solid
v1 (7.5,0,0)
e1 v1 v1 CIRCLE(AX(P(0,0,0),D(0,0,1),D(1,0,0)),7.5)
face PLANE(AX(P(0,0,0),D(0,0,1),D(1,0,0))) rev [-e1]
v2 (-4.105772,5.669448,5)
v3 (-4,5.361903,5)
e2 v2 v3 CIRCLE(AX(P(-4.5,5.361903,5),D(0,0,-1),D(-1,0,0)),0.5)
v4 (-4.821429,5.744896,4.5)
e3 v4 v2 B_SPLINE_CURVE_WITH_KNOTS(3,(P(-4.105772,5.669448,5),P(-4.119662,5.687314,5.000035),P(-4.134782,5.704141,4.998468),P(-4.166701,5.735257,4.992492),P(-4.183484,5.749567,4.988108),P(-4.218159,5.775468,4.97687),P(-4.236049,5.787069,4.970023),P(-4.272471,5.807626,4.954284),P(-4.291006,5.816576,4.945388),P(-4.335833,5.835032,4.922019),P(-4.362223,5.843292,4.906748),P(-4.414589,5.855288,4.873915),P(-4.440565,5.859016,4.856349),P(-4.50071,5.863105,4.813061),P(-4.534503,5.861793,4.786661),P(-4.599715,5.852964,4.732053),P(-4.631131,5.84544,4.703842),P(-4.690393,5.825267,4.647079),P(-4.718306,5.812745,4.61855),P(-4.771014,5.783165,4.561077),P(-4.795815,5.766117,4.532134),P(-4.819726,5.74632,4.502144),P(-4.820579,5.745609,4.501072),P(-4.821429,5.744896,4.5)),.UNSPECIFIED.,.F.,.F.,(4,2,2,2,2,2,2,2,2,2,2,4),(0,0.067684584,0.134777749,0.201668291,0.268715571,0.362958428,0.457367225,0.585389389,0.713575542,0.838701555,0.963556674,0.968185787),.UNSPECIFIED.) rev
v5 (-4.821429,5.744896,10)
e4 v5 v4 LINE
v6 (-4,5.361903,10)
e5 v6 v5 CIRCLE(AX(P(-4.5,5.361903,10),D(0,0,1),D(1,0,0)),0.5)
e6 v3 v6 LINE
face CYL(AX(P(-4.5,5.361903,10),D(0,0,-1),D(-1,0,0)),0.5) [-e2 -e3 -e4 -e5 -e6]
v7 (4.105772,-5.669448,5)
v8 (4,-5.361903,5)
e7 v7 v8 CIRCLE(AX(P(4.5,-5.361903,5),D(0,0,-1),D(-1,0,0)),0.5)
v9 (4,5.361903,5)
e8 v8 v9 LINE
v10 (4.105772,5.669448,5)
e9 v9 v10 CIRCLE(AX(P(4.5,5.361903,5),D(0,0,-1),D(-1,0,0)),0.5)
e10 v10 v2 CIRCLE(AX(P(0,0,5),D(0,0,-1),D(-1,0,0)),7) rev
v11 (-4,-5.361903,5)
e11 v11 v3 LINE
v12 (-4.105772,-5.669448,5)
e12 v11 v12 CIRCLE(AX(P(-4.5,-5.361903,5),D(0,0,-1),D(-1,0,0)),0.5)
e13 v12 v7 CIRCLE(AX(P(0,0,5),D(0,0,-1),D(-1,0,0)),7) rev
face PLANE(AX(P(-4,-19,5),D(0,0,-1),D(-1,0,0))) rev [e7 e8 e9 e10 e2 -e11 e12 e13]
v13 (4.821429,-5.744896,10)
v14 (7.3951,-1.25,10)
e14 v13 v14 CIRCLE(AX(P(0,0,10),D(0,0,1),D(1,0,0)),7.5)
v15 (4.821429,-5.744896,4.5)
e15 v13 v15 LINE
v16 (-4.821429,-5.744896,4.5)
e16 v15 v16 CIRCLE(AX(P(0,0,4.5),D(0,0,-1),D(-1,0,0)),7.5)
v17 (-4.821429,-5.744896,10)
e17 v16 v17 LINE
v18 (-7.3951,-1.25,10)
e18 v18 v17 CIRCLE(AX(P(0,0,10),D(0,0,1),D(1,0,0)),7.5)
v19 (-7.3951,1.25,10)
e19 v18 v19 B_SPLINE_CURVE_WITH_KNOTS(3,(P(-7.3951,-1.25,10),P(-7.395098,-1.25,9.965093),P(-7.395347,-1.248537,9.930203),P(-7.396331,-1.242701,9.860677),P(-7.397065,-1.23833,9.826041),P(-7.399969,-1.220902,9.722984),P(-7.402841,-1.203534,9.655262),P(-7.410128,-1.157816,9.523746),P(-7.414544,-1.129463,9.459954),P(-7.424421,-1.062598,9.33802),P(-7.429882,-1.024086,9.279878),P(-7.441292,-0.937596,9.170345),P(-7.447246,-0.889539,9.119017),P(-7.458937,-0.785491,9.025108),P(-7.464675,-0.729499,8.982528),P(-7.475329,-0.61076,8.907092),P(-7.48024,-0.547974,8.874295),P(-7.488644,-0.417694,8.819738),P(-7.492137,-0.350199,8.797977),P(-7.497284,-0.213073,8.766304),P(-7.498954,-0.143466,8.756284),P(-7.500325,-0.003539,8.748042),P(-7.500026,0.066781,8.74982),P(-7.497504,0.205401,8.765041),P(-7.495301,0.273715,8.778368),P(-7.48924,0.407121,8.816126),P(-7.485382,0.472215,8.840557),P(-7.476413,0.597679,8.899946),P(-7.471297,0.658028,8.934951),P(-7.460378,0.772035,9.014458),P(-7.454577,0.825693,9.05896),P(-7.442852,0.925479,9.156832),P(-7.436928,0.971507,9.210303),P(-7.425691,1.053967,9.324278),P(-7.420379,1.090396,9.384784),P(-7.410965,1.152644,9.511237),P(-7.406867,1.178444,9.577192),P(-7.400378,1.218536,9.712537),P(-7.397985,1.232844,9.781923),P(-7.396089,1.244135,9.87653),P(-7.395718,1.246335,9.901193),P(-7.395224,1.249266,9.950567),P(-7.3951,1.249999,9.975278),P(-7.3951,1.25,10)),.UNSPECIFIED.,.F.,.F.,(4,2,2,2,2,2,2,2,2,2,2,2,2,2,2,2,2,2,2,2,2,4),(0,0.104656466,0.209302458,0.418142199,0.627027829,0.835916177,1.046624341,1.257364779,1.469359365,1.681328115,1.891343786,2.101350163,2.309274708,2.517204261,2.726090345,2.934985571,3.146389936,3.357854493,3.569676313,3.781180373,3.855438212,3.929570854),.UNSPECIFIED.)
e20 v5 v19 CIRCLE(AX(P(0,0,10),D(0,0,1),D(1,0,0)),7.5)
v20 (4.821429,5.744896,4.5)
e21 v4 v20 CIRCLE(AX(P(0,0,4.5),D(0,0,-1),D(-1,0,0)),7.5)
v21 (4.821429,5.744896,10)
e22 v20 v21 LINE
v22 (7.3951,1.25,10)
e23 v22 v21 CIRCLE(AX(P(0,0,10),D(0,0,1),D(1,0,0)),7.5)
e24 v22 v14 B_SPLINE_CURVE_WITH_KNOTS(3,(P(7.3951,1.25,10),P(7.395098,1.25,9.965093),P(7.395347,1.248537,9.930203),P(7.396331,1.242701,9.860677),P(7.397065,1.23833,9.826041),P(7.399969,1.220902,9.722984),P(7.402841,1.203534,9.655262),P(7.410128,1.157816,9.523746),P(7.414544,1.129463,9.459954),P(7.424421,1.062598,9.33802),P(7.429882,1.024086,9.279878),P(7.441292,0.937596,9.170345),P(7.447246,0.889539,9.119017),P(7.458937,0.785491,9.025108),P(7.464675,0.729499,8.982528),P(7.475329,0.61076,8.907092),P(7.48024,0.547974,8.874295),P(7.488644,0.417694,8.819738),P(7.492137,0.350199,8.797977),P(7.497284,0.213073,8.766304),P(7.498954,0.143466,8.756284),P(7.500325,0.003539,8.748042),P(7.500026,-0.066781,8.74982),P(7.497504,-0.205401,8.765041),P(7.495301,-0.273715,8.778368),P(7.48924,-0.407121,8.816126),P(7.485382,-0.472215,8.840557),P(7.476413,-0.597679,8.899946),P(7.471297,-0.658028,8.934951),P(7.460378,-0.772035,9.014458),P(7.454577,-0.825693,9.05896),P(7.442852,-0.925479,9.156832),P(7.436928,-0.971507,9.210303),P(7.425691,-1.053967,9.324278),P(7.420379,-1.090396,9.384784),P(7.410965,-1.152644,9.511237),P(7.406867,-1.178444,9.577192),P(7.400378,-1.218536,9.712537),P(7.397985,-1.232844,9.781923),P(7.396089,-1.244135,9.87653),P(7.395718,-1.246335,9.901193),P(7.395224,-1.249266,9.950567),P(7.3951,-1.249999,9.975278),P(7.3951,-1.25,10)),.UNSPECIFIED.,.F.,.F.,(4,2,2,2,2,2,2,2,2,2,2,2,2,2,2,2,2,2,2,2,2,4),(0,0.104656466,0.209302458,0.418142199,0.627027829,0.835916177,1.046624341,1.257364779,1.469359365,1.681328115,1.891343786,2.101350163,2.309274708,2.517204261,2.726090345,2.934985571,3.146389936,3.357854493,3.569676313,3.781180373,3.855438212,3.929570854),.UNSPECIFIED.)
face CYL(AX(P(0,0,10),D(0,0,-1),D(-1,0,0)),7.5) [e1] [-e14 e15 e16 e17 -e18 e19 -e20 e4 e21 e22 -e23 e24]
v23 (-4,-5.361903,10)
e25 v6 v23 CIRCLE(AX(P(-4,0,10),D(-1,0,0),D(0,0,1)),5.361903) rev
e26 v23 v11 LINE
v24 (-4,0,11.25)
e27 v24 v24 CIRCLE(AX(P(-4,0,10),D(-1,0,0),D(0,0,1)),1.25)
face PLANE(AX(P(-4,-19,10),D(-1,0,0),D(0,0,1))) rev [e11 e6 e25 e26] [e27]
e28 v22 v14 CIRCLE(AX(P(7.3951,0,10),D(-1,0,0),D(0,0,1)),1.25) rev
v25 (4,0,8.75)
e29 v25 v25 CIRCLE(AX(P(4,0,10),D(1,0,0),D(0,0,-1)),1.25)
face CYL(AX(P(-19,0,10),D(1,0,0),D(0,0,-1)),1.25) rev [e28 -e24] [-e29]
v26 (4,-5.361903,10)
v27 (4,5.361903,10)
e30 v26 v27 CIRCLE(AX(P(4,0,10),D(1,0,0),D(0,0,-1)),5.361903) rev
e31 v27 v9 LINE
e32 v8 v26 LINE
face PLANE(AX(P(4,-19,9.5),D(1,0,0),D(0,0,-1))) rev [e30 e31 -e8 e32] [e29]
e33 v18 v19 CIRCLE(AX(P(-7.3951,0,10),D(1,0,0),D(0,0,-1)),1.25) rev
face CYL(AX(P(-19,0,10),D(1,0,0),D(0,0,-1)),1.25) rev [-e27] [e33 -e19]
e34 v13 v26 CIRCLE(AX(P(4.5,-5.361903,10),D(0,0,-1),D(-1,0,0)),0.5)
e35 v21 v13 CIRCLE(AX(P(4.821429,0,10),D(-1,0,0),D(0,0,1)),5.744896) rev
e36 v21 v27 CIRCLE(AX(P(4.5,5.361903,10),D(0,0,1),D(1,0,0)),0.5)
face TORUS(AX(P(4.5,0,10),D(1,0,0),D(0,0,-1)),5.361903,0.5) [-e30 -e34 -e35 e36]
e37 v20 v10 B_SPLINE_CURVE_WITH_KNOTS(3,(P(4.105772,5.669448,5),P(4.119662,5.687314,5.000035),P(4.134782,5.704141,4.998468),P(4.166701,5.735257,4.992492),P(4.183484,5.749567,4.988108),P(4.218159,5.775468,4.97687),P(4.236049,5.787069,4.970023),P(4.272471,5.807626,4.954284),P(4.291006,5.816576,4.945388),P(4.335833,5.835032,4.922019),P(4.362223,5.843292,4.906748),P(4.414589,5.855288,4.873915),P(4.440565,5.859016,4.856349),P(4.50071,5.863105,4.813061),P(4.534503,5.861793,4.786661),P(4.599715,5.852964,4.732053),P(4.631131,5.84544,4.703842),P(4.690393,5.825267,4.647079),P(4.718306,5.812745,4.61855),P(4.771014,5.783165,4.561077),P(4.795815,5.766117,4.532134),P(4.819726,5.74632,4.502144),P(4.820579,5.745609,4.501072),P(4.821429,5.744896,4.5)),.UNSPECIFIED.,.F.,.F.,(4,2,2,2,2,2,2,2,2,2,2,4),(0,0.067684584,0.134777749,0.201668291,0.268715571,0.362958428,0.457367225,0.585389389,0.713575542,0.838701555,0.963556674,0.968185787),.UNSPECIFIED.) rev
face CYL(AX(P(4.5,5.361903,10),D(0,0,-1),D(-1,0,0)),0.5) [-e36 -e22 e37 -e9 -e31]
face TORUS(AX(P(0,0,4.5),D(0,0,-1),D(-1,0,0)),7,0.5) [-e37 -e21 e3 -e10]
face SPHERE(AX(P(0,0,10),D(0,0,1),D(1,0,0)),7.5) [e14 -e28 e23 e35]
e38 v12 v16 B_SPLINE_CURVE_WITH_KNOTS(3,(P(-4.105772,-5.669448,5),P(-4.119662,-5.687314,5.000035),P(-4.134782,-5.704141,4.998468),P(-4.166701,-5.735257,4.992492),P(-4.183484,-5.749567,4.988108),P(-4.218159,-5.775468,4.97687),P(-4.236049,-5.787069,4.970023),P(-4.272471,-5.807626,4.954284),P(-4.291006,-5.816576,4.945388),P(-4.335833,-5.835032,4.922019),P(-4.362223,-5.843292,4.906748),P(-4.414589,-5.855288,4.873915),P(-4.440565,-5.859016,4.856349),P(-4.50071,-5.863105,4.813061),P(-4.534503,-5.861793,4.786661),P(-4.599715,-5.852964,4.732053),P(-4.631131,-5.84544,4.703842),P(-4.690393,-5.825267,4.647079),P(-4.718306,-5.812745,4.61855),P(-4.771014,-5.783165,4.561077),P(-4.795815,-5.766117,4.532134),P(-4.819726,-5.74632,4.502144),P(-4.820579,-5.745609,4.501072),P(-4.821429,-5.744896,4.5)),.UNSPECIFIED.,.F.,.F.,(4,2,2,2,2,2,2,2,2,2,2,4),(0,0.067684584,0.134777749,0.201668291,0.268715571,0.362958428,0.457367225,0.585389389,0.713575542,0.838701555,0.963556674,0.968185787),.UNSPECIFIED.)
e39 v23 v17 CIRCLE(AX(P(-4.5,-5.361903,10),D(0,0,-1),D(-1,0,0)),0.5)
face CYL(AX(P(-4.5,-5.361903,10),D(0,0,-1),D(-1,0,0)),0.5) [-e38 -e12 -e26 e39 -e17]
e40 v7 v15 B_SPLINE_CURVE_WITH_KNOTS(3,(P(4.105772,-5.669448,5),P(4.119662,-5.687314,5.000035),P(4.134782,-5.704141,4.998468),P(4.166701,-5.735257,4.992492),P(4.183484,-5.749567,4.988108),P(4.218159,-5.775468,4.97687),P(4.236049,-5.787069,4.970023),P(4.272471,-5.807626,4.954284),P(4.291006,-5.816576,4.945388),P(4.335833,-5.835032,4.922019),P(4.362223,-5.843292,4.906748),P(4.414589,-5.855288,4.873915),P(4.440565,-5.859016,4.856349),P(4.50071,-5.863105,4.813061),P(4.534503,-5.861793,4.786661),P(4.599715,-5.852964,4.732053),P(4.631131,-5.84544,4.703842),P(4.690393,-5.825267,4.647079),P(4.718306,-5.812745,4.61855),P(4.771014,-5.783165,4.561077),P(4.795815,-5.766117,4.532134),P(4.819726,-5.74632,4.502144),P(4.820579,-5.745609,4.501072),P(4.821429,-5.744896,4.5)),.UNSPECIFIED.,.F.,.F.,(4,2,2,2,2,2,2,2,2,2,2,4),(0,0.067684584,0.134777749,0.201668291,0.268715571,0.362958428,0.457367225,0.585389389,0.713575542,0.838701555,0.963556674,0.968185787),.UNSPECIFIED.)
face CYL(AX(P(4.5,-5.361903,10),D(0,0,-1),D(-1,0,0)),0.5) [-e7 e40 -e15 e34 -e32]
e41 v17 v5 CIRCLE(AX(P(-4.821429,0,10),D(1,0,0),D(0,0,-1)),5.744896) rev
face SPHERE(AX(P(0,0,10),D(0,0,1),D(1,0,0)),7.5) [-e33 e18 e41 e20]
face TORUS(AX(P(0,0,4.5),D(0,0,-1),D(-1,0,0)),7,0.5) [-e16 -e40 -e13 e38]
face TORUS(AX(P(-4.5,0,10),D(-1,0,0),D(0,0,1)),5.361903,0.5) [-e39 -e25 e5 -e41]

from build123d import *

# Parameters (mm, degrees)
CROQUIS1_R                 = 7.5
SALIENTE_EXTRUIR1_DEPTH    = 10
C_PULA1_FACE_RADIUS        = 7.5
C_PULA1_HEIGHT             = 7.5
CORTAR_EXTRUIR1_DEPTH      = 10
CORTAR_EXTRUIR1_DEPTH_BACK = 19
CORTAR_EXTRUIR2_DEPTH      = 11
CORTAR_EXTRUIR2_DEPTH_BACK = 19
CROQUIS3_R                 = 1.25
REDONDEO1_R                = 0.5


with BuildPart() as part:
    # Croquis1 → Saliente-Extruir1 (new body)
    with BuildSketch(Plane.XY):
        Circle(CROQUIS1_R)
    extrude(amount=SALIENTE_EXTRUIR1_DEPTH)

    # Cúpula1: a dome of height H over a round flat face of radius A is a cap of a sphere of radius (A * A + H * H) / (2 * H)
    c_pula1_r = (C_PULA1_FACE_RADIUS * C_PULA1_FACE_RADIUS + C_PULA1_HEIGHT * C_PULA1_HEIGHT) / (2 * C_PULA1_HEIGHT)
    c_pula1_base = Plane((0, 0, 10), z_dir=(0, 0, 1))
    with Locations(c_pula1_base.offset(C_PULA1_HEIGHT - c_pula1_r)):
        c_pula1_ball = Sphere(c_pula1_r, mode=Mode.PRIVATE)
    add(split(c_pula1_ball, bisect_by=c_pula1_base, keep=Keep.TOP, mode=Mode.PRIVATE))

    # Croquis2 → Cortar-Extruir1 (cut, two sides: drawn at the far end of the back side and taken through both)
    with BuildSketch(Plane(origin=(0, 0, 0), x_dir=(1, 0, 0), z_dir=(0, 1, 0)).offset(-CORTAR_EXTRUIR1_DEPTH_BACK)):
        Polygon((-4, -10), (-4, -17.5), (4, -17.5), (4, -9.5), (4, -5), (-4, -5), align=None)
    extrude(amount=CORTAR_EXTRUIR1_DEPTH + CORTAR_EXTRUIR1_DEPTH_BACK, mode=Mode.SUBTRACT)

    # Croquis3 → Cortar-Extruir2 (cut, two sides: drawn at the far end of the back side and taken through both)
    with BuildSketch(Plane(origin=(0, 0, 0), x_dir=(0, 0, -1), z_dir=(1, 0, 0)).offset(-CORTAR_EXTRUIR2_DEPTH_BACK)):
        with Locations(Location((-10, 0, 0), (0, 0, 270))):
            Circle(CROQUIS3_R)
    extrude(amount=CORTAR_EXTRUIR2_DEPTH + CORTAR_EXTRUIR2_DEPTH_BACK, mode=Mode.SUBTRACT)

    # Redondeo1
    # the kernel refuses this fillet: 0.5 mm, written as the material it takes off along each edge
    with BuildSketch(Plane(origin=(0, 0, 5), x_dir=(-0.6663010614300323, 0.7456828384354923, 0), z_dir=(-0.7456828384354923, -0.6663010614300323, 0))) as redondeo1_piece_1_section:
        with BuildLine():
            CenterArc((7.5 - REDONDEO1_R, REDONDEO1_R), REDONDEO1_R, 270, 90)
            Line((7.5 - REDONDEO1_R, 0), (7.5, 0))
            Line((7.5, 0), (7.5, REDONDEO1_R))
        make_face()
    redondeo1_piece_1 = revolve(axis=Axis((0, 0, 5), (0, 0, -1)), revolution_arc=83.564433706, mode=Mode.PRIVATE)
    redondeo1_piece_1 = split(redondeo1_piece_1, bisect_by=Plane(origin=(4, 7.359307854, 4.859307854), z_dir=(-1, 0, 0)), keep=Keep.TOP, mode=Mode.PRIVATE)
    redondeo1_piece_1 = split(redondeo1_piece_1, bisect_by=Plane(origin=(-4, 7.359307854, 4.859307854), z_dir=(1, 0, 0)), keep=Keep.TOP, mode=Mode.PRIVATE)
    add(redondeo1_piece_1, mode=Mode.SUBTRACT)
    with BuildSketch(Plane(origin=(4, -6.34428877, 10), x_dir=(0.807803952835934, 0.5894512480117758, 0), z_dir=(0, 0, -1)), Plane(origin=(-4, 6.34428877, 10), x_dir=(-0.8078039528359331, -0.5894512480117771, 0), z_dir=(0, 0, -1))) as redondeo1_piece_2:
        with BuildLine():
            CenterArc((0.982970703, -0.498849769), REDONDEO1_R, 86.112875875, 130.005200885)
            Line((0.579068726, -0.793575393), (0, 0))
            ThreePointArc((0, 0), (0.508433122, 0.017253461), (1.016866244, 0))
        make_face()
    extrude(amount=5, mode=Mode.SUBTRACT)
    with BuildSketch(Plane(origin=(4, 6.34428877, 10), x_dir=(0.8078039528359339, -0.5894512480117758, 0), z_dir=(0, 0, -1)), Plane(origin=(-4, -6.34428877, 10), x_dir=(-0.8078039528359333, 0.5894512480117767, 0), z_dir=(0, 0, -1))) as redondeo1_piece_3:
        with BuildLine():
            CenterArc((0.982970703, 0.498849769), REDONDEO1_R, 143.88192324, 130.005200885)
            Line((0.579068726, 0.793575393), (0, 0))
            ThreePointArc((0, 0), (0.508433122, -0.017253461), (1.016866244, 0))
        make_face()
    extrude(amount=5, mode=Mode.SUBTRACT)
    with BuildSketch(Plane(origin=(-4, 0, 10), x_dir=(0, 1, 0), z_dir=(0, 0, -1))) as redondeo1_piece_4:
        with BuildLine():
            CenterArc((5.361902647, -0.5), REDONDEO1_R, 319.994799115, 130.005200885)
            ThreePointArc((5.744895694, -0.821428571), (6.058529646, -0.42088436), (6.34428877, 0))
            Line((6.34428877, 0), (5.361902647, 0))
        make_face()
    revolve(axis=Axis((-4, 0, 10), (1, 0, 0)), revolution_arc=180, mode=Mode.SUBTRACT)
    with BuildSketch(Plane(origin=(4, 0, 10), x_dir=(0, 1, 0), z_dir=(0, 0, -1))) as redondeo1_piece_5:
        with BuildLine():
            CenterArc((5.361902647, 0.5), REDONDEO1_R, 270, 130.005200885)
            Line((5.361902647, 0), (6.34428877, 0))
            ThreePointArc((6.34428877, 0), (6.058529646, 0.42088436), (5.744895694, 0.821428571))
        make_face()
    revolve(axis=Axis((4, 0, 10), (1, 0, 0)), revolution_arc=180, mode=Mode.SUBTRACT)
    with BuildSketch(Plane(origin=(0, 0, 5), x_dir=(0.6663010614300334, -0.7456828384354912, 0), z_dir=(0.7456828384354912, 0.6663010614300334, 0))) as redondeo1_piece_6_section:
        with BuildLine():
            CenterArc((7.5 - REDONDEO1_R, REDONDEO1_R), REDONDEO1_R, 270, 90)
            Line((7.5 - REDONDEO1_R, 0), (7.5, 0))
            Line((7.5, 0), (7.5, REDONDEO1_R))
        make_face()
    redondeo1_piece_6 = revolve(axis=Axis((0, 0, 5), (0, 0, -1)), revolution_arc=83.564433706, mode=Mode.PRIVATE)
    redondeo1_piece_6 = split(redondeo1_piece_6, bisect_by=Plane(origin=(4, -7.359307854, 4.859307854), z_dir=(-1, 0, 0)), keep=Keep.TOP, mode=Mode.PRIVATE)
    redondeo1_piece_6 = split(redondeo1_piece_6, bisect_by=Plane(origin=(-4, -7.359307854, 4.859307854), z_dir=(1, 0, 0)), keep=Keep.TOP, mode=Mode.PRIVATE)
    add(redondeo1_piece_6, mode=Mode.SUBTRACT)
    with BuildSketch(Plane(origin=(-4, 6.34428877, 10), x_dir=(-0.8078039528359331, -0.5894512480117771, 0), z_dir=(0, 0, -1))) as redondeo1_piece_7a_section:
        with BuildLine():
            CenterArc((0.982970703, -0.498849769), REDONDEO1_R, 86.112875875, 130.005200885)
            Line((0.579068726, -0.793575393), (0, 0))
            ThreePointArc((0, 0), (0.508433122, 0.017253461), (1.016866244, 0))
        make_face()
    redondeo1_piece_7a = extrude(amount=7.54216561, mode=Mode.PRIVATE)
    redondeo1_piece_7a = split(redondeo1_piece_7a, bisect_by=Plane(origin=(-4.209576919, 5.957871406, 5), z_dir=(0, 0, -1)), keep=Keep.TOP, mode=Mode.PRIVATE)
    with BuildSketch(Plane(origin=(0, 0, 5), x_dir=(-0.6663010614300323, 0.7456828384354923, 0), z_dir=(-0.7456828384354923, -0.6663010614300323, 0))) as redondeo1_piece_7b_section:
        with BuildLine():
            CenterArc((7.5 - REDONDEO1_R, REDONDEO1_R), REDONDEO1_R, 270, 90)
            Line((7.5 - REDONDEO1_R, 0), (7.5, 0))
            Line((7.5, 0), (7.5, REDONDEO1_R))
        make_face()
    redondeo1_piece_7b = revolve(axis=Axis((0, 0, 5), (0, 0, -1)), revolution_arc=83.564433706, mode=Mode.PRIVATE)
    redondeo1_piece_7b = split(redondeo1_piece_7b, bisect_by=Plane(origin=(-4, 5.878976183, 4.882052038), z_dir=(-1, 0, 0)), keep=Keep.TOP, mode=Mode.PRIVATE)
    redondeo1_piece_7 = redondeo1_piece_7a & redondeo1_piece_7b
    add(redondeo1_piece_7, mode=Mode.SUBTRACT)
    with BuildSketch(Plane(origin=(0, 0, 5), x_dir=(-0.6663010614300323, 0.7456828384354923, 0), z_dir=(-0.7456828384354923, -0.6663010614300323, 0))) as redondeo1_piece_8a_section:
        with BuildLine():
            CenterArc((7.5 - REDONDEO1_R, REDONDEO1_R), REDONDEO1_R, 270, 90)
            Line((7.5 - REDONDEO1_R, 0), (7.5, 0))
            Line((7.5, 0), (7.5, REDONDEO1_R))
        make_face()
    redondeo1_piece_8a = revolve(axis=Axis((0, 0, 5), (0, 0, -1)), revolution_arc=83.564433706, mode=Mode.PRIVATE)
    redondeo1_piece_8a = split(redondeo1_piece_8a, bisect_by=Plane(origin=(4, 5.878976375, 4.882052003), z_dir=(1, 0, 0)), keep=Keep.TOP, mode=Mode.PRIVATE)
    with BuildSketch(Plane(origin=(4, 6.34428877, 10), x_dir=(0.8078039528359339, -0.5894512480117758, 0), z_dir=(0, 0, -1))) as redondeo1_piece_8b_section:
        with BuildLine():
            CenterArc((0.982970703, 0.498849769), REDONDEO1_R, 143.88192324, 130.005200885)
            Line((0.579068726, 0.793575393), (0, 0))
            ThreePointArc((0, 0), (0.508433122, -0.017253461), (1.016866244, 0))
        make_face()
    redondeo1_piece_8b = extrude(amount=7.54216561, mode=Mode.PRIVATE)
    redondeo1_piece_8b = split(redondeo1_piece_8b, bisect_by=Plane(origin=(4.209576919, 5.957871406, 5), z_dir=(0, 0, -1)), keep=Keep.TOP, mode=Mode.PRIVATE)
    redondeo1_piece_8 = redondeo1_piece_8a & redondeo1_piece_8b
    add(redondeo1_piece_8, mode=Mode.SUBTRACT)
    with BuildSketch(Plane(origin=(4, -6.34428877, 10), x_dir=(0.807803952835934, 0.5894512480117758, 0), z_dir=(0, 0, -1))) as redondeo1_piece_9a_section:
        with BuildLine():
            CenterArc((0.982970703, -0.498849769), REDONDEO1_R, 86.112875875, 130.005200885)
            Line((0.579068726, -0.793575393), (0, 0))
            ThreePointArc((0, 0), (0.508433122, 0.017253461), (1.016866244, 0))
        make_face()
    redondeo1_piece_9a = extrude(amount=7.54216561, mode=Mode.PRIVATE)
    redondeo1_piece_9a = split(redondeo1_piece_9a, bisect_by=Plane(origin=(4.209576919, -5.957871406, 5), z_dir=(0, 0, -1)), keep=Keep.TOP, mode=Mode.PRIVATE)
    with BuildSketch(Plane(origin=(0, 0, 5), x_dir=(0.6663010614300334, -0.7456828384354912, 0), z_dir=(0.7456828384354912, 0.6663010614300334, 0))) as redondeo1_piece_9b_section:
        with BuildLine():
            CenterArc((7.5 - REDONDEO1_R, REDONDEO1_R), REDONDEO1_R, 270, 90)
            Line((7.5 - REDONDEO1_R, 0), (7.5, 0))
            Line((7.5, 0), (7.5, REDONDEO1_R))
        make_face()
    redondeo1_piece_9b = revolve(axis=Axis((0, 0, 5), (0, 0, -1)), revolution_arc=83.564433706, mode=Mode.PRIVATE)
    redondeo1_piece_9b = split(redondeo1_piece_9b, bisect_by=Plane(origin=(4, -5.878976176, 4.88205204), z_dir=(1, 0, 0)), keep=Keep.TOP, mode=Mode.PRIVATE)
    redondeo1_piece_9 = redondeo1_piece_9a & redondeo1_piece_9b
    add(redondeo1_piece_9, mode=Mode.SUBTRACT)
    with BuildSketch(Plane(origin=(0, 0, 5), x_dir=(0.6663010614300334, -0.7456828384354912, 0), z_dir=(0.7456828384354912, 0.6663010614300334, 0))) as redondeo1_piece_10a_section:
        with BuildLine():
            CenterArc((7.5 - REDONDEO1_R, REDONDEO1_R), REDONDEO1_R, 270, 90)
            Line((7.5 - REDONDEO1_R, 0), (7.5, 0))
            Line((7.5, 0), (7.5, REDONDEO1_R))
        make_face()
    redondeo1_piece_10a = revolve(axis=Axis((0, 0, 5), (0, 0, -1)), revolution_arc=83.564433706, mode=Mode.PRIVATE)
    redondeo1_piece_10a = split(redondeo1_piece_10a, bisect_by=Plane(origin=(-4, -5.878976383, 4.882052), z_dir=(-1, 0, 0)), keep=Keep.TOP, mode=Mode.PRIVATE)
    with BuildSketch(Plane(origin=(-4, -6.34428877, 10), x_dir=(-0.8078039528359333, 0.5894512480117767, 0), z_dir=(0, 0, -1))) as redondeo1_piece_10b_section:
        with BuildLine():
            CenterArc((0.982970703, 0.498849769), REDONDEO1_R, 143.88192324, 130.005200885)
            Line((0.579068726, 0.793575393), (0, 0))
            ThreePointArc((0, 0), (0.508433122, -0.017253461), (1.016866244, 0))
        make_face()
    redondeo1_piece_10b = extrude(amount=7.54216561, mode=Mode.PRIVATE)
    redondeo1_piece_10b = split(redondeo1_piece_10b, bisect_by=Plane(origin=(-4.209576919, -5.957871406, 5), z_dir=(0, 0, -1)), keep=Keep.TOP, mode=Mode.PRIVATE)
    redondeo1_piece_10 = redondeo1_piece_10a & redondeo1_piece_10b
    add(redondeo1_piece_10, mode=Mode.SUBTRACT)


solid = part.part
